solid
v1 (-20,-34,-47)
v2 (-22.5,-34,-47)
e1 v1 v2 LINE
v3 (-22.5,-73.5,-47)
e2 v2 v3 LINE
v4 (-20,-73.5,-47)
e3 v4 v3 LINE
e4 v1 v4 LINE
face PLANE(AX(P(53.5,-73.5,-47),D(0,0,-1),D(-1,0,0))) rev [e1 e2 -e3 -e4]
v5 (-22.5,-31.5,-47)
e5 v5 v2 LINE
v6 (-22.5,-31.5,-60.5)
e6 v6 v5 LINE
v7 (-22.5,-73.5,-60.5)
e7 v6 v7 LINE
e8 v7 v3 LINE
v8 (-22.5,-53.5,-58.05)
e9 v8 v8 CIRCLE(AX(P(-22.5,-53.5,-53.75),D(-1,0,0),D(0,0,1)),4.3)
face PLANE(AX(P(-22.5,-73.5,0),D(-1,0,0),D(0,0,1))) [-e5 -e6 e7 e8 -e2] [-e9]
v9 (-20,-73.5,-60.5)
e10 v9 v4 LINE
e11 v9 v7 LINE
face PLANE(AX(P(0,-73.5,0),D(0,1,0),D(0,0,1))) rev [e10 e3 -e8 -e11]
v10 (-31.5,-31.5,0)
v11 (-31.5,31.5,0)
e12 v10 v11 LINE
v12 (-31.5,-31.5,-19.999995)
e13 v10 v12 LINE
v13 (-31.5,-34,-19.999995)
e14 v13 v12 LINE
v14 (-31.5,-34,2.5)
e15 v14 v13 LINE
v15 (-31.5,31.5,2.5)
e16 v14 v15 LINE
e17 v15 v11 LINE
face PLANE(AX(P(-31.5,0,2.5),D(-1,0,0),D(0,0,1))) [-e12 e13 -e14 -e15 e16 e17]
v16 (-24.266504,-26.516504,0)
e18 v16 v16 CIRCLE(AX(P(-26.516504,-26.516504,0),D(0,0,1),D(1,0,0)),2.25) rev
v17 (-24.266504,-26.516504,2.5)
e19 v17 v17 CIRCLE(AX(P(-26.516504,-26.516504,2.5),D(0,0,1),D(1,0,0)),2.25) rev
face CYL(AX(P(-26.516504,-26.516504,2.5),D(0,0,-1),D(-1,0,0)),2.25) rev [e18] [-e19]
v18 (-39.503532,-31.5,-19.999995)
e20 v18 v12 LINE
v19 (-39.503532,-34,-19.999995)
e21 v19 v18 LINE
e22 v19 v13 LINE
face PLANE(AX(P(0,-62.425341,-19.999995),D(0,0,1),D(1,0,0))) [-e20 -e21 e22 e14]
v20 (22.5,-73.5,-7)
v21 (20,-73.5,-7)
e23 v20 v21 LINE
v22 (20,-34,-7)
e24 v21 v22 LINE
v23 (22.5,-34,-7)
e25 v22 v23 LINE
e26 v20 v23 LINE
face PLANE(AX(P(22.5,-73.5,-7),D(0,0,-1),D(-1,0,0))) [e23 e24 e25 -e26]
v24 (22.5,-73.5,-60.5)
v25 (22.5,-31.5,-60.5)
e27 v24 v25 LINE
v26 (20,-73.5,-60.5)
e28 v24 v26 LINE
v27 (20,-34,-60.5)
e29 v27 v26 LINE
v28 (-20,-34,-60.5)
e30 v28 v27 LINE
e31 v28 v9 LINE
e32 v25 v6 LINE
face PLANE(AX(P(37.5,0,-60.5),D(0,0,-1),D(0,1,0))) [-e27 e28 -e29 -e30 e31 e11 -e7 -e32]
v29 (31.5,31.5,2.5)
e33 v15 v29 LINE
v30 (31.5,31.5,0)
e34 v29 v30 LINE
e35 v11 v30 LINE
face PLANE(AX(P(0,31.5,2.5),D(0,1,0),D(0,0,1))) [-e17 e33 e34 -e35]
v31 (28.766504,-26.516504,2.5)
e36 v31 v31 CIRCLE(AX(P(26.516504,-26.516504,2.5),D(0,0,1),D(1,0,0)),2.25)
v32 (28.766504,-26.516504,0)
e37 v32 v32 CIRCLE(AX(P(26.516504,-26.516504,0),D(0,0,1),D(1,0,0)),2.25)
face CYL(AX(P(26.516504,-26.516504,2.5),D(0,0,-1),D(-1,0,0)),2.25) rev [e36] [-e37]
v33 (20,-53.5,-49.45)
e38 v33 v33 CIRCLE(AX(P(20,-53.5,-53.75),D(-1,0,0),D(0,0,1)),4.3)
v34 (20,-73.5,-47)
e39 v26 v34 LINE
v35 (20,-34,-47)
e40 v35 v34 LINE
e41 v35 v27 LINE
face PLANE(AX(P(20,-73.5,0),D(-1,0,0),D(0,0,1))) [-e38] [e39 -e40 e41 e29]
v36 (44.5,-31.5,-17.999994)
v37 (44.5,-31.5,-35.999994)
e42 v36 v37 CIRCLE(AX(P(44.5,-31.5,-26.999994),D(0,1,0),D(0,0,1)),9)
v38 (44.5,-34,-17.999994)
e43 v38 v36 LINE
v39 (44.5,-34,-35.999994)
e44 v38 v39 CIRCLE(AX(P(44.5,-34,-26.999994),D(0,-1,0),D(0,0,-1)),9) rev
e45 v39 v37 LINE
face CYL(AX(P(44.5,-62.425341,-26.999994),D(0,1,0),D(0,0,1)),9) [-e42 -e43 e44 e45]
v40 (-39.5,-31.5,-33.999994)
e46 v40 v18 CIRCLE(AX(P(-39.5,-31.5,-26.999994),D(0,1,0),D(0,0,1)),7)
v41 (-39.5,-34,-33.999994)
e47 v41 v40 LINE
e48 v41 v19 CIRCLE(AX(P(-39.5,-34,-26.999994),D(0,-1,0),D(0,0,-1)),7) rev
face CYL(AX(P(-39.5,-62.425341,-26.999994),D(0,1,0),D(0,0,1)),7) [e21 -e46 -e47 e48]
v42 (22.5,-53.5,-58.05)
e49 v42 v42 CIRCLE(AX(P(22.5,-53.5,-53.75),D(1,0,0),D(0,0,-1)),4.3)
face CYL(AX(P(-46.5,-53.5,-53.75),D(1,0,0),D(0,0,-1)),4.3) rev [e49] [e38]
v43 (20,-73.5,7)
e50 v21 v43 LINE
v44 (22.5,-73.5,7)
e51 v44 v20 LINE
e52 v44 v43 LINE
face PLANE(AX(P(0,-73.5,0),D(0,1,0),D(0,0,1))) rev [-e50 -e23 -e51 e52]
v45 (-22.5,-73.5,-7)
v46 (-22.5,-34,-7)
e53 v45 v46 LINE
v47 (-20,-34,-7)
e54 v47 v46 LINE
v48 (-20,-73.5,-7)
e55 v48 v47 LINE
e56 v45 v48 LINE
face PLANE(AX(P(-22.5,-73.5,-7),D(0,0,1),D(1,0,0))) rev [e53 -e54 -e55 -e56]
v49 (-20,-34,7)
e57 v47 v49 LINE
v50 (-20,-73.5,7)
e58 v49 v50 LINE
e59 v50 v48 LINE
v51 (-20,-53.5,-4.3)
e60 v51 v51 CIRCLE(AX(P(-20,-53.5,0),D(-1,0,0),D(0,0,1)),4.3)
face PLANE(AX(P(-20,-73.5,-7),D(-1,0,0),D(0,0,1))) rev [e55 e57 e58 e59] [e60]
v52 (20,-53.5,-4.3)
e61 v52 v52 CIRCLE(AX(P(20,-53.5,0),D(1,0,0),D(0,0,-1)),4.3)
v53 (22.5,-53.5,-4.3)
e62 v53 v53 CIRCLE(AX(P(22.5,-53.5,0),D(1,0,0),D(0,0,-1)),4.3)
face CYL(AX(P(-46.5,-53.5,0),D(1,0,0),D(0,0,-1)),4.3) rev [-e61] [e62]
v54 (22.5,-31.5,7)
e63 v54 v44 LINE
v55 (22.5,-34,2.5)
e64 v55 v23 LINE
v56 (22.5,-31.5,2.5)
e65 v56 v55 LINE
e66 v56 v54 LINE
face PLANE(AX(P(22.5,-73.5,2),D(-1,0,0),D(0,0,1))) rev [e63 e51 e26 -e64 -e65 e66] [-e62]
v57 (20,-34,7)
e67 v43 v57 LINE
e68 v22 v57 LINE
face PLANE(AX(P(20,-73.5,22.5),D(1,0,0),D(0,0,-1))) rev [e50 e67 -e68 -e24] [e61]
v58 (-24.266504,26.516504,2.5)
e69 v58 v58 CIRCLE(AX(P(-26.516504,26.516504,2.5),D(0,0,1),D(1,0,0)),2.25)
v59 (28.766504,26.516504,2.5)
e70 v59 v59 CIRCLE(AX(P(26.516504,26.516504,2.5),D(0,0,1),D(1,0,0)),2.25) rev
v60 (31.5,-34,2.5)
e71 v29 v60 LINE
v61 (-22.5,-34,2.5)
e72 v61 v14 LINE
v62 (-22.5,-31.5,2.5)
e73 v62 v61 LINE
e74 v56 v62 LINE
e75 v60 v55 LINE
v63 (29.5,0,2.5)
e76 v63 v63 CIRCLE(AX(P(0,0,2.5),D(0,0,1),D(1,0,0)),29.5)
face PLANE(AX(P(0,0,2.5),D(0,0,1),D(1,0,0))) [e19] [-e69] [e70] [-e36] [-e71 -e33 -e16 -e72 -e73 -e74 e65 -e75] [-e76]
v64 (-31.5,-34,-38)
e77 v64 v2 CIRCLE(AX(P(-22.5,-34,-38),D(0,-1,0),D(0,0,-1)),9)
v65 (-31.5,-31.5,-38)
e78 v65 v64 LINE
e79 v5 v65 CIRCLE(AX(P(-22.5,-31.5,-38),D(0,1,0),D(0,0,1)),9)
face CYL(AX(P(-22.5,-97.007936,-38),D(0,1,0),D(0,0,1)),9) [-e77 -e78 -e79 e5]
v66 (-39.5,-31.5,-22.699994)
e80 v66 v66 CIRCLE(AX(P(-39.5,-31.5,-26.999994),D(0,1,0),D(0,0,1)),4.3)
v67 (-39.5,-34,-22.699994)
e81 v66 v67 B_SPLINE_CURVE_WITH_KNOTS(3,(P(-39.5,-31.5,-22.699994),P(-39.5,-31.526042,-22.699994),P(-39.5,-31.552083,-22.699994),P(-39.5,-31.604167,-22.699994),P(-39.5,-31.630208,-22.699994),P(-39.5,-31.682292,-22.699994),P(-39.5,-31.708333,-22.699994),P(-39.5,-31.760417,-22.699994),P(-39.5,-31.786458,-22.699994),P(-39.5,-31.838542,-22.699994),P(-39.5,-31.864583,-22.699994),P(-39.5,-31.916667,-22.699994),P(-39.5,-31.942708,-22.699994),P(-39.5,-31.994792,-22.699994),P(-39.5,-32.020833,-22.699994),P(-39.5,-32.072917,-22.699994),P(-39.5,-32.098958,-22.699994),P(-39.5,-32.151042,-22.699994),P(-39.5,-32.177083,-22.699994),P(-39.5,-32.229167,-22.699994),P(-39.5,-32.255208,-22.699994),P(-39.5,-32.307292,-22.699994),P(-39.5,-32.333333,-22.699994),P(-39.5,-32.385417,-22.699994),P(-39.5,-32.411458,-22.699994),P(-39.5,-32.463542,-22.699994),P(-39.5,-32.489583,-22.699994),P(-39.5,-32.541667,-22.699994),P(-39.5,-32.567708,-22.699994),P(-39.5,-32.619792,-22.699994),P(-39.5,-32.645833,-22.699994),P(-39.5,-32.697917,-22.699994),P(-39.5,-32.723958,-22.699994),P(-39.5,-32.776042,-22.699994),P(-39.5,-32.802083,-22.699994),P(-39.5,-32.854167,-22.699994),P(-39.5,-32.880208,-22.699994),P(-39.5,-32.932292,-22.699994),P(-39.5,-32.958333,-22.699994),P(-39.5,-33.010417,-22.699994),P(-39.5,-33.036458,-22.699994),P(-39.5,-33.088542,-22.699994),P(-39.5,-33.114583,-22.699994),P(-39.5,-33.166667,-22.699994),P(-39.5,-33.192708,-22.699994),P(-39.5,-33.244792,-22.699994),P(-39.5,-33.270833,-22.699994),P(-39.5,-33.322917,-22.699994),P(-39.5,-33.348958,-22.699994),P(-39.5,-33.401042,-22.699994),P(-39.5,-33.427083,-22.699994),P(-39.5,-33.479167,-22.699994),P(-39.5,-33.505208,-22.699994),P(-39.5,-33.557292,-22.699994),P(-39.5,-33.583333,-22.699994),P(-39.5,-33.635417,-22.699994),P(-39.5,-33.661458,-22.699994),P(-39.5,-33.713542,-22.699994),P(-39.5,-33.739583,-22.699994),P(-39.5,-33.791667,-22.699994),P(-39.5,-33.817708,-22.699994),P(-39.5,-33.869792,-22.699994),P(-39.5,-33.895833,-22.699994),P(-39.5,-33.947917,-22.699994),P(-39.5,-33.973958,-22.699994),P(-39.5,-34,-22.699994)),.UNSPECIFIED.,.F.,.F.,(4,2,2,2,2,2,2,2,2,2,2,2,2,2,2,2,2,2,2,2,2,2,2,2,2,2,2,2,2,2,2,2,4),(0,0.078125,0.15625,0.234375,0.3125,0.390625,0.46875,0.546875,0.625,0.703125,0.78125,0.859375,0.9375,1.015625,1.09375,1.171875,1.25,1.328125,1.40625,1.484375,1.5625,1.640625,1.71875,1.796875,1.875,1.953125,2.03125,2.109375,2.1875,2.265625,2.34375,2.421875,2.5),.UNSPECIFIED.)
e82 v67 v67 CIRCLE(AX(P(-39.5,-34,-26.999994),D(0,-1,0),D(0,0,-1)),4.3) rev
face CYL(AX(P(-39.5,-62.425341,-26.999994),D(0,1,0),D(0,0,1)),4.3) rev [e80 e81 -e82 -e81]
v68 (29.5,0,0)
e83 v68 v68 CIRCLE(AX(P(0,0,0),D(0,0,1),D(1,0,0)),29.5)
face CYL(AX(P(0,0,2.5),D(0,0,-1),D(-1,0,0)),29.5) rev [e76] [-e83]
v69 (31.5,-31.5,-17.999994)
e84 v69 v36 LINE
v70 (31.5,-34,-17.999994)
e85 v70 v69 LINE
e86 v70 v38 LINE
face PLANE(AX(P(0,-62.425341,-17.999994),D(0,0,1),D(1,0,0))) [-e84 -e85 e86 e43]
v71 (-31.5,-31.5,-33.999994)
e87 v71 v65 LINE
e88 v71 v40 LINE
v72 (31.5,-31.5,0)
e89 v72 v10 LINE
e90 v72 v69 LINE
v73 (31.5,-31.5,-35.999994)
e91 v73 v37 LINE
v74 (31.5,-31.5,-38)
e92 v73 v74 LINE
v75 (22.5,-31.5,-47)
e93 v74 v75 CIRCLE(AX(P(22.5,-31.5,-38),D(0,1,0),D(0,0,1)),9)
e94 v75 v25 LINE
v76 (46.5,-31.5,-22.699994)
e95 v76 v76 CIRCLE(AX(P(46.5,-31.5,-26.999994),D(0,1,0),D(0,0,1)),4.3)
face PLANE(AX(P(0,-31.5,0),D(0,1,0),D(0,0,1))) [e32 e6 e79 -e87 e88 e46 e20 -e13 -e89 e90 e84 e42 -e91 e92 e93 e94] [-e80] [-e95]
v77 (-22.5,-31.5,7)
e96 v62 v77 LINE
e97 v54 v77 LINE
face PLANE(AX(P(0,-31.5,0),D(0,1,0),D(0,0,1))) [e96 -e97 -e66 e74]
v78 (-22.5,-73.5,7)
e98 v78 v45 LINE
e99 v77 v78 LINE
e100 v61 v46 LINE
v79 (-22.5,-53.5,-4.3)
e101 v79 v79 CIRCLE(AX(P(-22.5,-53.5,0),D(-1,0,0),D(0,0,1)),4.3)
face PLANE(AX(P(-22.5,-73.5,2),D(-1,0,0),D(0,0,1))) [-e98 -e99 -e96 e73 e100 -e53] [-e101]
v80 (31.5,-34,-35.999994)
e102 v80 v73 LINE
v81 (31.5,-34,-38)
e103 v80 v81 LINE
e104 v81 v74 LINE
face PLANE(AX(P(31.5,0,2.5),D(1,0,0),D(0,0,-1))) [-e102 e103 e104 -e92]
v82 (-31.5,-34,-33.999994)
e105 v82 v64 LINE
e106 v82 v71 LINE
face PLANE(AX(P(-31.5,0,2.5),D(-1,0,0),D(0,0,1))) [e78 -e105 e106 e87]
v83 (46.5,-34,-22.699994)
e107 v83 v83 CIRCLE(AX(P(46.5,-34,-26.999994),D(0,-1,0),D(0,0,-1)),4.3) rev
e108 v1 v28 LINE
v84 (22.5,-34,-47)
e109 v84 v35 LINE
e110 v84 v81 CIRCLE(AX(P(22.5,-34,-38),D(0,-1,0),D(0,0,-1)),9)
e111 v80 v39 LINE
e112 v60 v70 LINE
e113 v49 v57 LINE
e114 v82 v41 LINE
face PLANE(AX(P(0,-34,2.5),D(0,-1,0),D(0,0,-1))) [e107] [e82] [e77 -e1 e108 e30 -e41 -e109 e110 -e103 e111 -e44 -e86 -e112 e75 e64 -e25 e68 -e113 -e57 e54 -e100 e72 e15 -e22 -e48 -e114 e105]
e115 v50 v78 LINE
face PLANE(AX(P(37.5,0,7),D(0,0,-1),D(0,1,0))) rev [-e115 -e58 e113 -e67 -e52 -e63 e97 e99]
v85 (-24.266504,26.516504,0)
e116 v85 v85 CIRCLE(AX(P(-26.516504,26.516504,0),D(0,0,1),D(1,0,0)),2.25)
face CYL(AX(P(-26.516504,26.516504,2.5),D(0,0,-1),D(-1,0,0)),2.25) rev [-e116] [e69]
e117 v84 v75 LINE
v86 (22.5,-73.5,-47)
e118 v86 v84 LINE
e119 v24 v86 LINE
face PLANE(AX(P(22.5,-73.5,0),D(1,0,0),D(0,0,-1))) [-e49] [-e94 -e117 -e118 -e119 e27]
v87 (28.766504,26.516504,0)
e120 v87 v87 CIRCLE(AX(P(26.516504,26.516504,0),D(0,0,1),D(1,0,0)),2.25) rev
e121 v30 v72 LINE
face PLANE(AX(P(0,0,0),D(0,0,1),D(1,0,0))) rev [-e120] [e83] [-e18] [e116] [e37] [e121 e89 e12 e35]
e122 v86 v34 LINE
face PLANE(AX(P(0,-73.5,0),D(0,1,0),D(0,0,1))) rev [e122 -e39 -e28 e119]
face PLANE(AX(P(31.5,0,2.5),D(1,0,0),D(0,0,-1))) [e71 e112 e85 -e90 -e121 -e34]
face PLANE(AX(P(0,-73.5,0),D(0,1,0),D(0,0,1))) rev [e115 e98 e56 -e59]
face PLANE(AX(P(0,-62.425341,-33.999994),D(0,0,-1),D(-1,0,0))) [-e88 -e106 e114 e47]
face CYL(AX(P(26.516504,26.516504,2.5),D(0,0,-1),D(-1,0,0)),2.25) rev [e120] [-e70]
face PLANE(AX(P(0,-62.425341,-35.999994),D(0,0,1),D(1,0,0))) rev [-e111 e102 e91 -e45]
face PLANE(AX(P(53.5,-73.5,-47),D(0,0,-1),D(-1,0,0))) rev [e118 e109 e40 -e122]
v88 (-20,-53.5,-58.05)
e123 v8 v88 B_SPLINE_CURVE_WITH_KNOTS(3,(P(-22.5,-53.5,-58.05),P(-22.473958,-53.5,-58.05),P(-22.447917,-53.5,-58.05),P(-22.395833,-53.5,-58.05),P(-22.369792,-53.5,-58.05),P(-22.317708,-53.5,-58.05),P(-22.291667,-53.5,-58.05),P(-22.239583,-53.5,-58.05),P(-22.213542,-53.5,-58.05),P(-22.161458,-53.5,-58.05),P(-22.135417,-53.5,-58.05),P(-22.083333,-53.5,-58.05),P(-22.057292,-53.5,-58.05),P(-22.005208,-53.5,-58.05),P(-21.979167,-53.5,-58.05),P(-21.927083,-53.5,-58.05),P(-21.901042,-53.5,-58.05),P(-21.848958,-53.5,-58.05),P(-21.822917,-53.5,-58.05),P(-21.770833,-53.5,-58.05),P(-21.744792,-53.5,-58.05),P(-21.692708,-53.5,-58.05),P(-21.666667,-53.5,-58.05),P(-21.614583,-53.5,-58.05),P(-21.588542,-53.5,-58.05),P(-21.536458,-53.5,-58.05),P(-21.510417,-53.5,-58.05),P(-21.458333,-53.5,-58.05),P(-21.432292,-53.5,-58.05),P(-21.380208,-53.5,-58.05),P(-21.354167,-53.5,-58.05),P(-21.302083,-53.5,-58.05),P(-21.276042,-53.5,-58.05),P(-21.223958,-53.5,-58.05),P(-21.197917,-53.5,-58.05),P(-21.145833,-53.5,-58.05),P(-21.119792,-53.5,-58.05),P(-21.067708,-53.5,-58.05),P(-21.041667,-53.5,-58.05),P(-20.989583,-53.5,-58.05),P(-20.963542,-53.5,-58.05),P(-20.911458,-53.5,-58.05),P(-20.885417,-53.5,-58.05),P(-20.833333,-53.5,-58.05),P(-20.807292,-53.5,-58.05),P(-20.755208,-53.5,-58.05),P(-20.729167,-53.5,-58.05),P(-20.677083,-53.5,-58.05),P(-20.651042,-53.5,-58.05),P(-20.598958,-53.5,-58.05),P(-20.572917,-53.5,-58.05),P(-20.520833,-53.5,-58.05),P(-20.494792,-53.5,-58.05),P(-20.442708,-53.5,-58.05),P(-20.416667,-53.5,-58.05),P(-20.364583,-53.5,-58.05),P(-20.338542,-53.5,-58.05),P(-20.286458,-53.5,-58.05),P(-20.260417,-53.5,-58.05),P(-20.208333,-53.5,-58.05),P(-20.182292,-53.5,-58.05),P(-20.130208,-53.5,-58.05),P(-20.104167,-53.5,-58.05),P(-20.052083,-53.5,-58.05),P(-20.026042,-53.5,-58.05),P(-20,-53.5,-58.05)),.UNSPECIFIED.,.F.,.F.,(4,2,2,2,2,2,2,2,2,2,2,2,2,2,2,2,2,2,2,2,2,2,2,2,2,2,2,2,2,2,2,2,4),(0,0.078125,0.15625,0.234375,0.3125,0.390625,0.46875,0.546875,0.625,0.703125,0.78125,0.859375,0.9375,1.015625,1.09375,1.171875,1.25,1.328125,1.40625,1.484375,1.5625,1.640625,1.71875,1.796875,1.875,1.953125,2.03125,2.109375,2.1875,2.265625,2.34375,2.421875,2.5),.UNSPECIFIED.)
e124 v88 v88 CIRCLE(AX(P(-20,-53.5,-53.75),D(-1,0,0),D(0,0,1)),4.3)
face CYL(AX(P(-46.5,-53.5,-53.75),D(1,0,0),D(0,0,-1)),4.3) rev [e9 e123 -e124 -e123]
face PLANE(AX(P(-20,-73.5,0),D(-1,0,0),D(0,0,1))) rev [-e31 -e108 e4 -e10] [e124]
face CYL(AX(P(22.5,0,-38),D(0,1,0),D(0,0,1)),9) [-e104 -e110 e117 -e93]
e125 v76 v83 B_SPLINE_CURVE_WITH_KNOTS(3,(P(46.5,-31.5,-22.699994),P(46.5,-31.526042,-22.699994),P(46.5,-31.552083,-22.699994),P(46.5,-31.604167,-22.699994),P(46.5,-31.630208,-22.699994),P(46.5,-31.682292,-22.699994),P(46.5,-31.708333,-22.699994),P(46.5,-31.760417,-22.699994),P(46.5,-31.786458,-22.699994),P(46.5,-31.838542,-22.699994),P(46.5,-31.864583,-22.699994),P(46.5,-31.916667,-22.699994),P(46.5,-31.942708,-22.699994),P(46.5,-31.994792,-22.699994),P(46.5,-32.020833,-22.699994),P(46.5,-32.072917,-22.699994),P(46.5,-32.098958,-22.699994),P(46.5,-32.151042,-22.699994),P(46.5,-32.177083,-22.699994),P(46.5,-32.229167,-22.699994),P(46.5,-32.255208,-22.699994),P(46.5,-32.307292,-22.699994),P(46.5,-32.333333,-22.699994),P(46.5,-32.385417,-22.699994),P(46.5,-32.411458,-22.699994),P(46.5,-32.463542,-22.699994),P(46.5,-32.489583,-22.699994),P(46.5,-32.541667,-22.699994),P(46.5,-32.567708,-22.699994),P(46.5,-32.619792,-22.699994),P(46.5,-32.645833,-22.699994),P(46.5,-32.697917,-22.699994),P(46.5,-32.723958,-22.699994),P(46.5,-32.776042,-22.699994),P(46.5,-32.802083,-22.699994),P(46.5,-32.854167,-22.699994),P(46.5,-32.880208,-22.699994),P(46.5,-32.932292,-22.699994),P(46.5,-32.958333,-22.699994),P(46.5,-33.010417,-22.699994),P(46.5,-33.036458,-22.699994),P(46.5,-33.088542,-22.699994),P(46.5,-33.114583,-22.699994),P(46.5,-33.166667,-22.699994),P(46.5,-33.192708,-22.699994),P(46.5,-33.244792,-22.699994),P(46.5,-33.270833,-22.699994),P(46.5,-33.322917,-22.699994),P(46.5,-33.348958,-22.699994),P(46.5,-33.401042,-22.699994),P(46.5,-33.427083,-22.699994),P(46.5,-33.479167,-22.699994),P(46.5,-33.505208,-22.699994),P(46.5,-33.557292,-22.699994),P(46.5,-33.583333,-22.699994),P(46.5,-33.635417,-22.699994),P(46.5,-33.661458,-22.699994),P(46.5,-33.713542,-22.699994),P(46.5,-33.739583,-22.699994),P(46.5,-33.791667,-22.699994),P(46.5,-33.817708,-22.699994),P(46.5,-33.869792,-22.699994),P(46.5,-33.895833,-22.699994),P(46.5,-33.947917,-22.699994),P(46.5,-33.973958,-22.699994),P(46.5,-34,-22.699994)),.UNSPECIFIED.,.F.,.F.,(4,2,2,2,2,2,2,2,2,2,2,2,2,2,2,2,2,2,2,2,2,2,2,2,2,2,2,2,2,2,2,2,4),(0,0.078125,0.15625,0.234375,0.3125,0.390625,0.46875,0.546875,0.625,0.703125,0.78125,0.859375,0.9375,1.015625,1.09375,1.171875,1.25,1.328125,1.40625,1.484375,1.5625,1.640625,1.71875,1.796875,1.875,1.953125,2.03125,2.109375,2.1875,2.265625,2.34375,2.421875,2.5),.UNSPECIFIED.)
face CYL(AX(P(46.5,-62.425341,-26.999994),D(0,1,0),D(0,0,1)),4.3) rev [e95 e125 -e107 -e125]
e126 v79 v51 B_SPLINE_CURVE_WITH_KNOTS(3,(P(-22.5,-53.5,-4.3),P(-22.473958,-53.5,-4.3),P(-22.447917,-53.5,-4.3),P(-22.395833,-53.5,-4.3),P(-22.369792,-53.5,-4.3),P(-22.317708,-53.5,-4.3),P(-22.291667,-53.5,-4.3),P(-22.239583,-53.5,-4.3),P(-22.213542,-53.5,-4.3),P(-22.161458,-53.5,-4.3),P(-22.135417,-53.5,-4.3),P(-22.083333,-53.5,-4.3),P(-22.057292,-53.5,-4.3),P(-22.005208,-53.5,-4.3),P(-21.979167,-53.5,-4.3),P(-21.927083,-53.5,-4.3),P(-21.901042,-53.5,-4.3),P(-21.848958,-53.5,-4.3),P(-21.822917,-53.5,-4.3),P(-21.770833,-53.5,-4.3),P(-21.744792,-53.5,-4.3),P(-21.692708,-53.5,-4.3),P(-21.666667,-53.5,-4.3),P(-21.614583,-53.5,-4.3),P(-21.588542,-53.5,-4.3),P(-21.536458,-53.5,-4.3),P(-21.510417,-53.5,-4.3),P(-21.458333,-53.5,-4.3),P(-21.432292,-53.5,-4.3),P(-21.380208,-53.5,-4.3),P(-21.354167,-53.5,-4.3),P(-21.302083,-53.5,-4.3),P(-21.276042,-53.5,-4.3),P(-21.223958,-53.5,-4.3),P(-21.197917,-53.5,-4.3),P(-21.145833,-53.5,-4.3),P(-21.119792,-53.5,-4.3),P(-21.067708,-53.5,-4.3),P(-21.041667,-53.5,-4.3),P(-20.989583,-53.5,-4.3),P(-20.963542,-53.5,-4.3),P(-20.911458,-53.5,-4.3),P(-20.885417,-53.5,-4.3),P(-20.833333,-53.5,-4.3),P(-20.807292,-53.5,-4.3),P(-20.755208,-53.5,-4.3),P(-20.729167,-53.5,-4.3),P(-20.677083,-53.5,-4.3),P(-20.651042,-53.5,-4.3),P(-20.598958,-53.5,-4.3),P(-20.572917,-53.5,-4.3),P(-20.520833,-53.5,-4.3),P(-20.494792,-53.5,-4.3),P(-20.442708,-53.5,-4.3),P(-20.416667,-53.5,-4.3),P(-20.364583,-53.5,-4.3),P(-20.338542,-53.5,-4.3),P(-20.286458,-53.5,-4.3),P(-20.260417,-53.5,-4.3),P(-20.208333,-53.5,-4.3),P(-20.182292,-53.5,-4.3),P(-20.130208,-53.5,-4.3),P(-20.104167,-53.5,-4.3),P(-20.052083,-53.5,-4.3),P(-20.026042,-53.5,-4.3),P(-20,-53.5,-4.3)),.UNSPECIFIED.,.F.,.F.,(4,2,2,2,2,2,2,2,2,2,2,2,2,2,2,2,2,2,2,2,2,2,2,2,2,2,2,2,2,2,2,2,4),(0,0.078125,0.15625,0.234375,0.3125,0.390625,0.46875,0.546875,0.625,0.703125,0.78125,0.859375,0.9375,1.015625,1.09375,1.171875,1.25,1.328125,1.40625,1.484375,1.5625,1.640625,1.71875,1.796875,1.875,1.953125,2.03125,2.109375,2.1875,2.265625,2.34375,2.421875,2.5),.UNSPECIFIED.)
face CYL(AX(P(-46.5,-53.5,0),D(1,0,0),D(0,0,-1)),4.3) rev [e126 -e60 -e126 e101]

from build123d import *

# Parameters (mm, degrees)
SKETCH_1_R           = 29.5
SKETCH_1_R_2         = 2.25
EXTRUDE_1_DEPTH      = 2.5
EXTRUDE_2_DEPTH      = 2.5
SKETCH_3_W           = 2.5
SKETCH_3_H           = 20.5
SKETCH_3_H_2         = 29.5
EXTRUDE_3_DEPTH      = 42
SKETCH_4_W           = 15.5
SKETCH_4_H           = 42
SKETCH_4_W_2         = 6
CUT_EXTRUDE_1_DEPTH  = 60
SKETCH_5_R           = 4.3
EXTRUDE_4_DEPTH      = 2.5
CUT_EXTRUDE_9_DEPTH  = 122.813381989
EXTRUDE_6_DEPTH      = 2.5
SKETCH_14_R          = 4.3
CUT_EXTRUDE_10_DEPTH = 118.573381341
FILLET_3_R           = 9


with BuildPart() as part:
    # 草图1 → 凸台-拉伸1 (new body)
    with BuildSketch(Plane.XY):
        Polygon((0, 31.5), (31.5, 31.5), (31.5, -34), (-31.5, -34), (-31.5, 31.5), align=None)
        Circle(SKETCH_1_R, mode=Mode.SUBTRACT)
        with Locations((-26.516504294, 26.516504294)):
            Circle(SKETCH_1_R_2, mode=Mode.SUBTRACT)
        with Locations((26.516504294, 26.516504294)):
            Circle(SKETCH_1_R_2, mode=Mode.SUBTRACT)
        with Locations((26.516504294, -26.516504294)):
            Circle(SKETCH_1_R_2, mode=Mode.SUBTRACT)
        with Locations((-26.516504294, -26.516504294)):
            Circle(SKETCH_1_R_2, mode=Mode.SUBTRACT)
    extrude(amount=EXTRUDE_1_DEPTH)

    # 草图2 → 凸台-拉伸2 (add)
    with BuildSketch(Plane(origin=(0, -34, 0), x_dir=(1, 0, 0), z_dir=(0, 1, 0))):
        Polygon((-31.5, 46.5), (-31.5, -2.5), (-20, -2.5), (-20, -22.5), (20, -22.5), (20, -2.5), (31.5, -2.5), (31.5, 46.5), (20, 46.5), (20, 66.5), (-20, 66.5), (-20, 46.5), align=None)
    extrude(amount=EXTRUDE_2_DEPTH)

    # 草图3 → 凸台-拉伸3 (add)
    with BuildSketch(Plane(origin=(0, -31.5, 0), x_dir=(1, 0, 0), z_dir=(0, 1, 0))):
        with Locations((21.25, 56.25)):
            Rectangle(SKETCH_3_W, SKETCH_3_H)
        with Locations((-21.25, 56.25)):
            Rectangle(SKETCH_3_W, SKETCH_3_H)
        with Locations((-21.25, -7.75)):
            Rectangle(SKETCH_3_W, SKETCH_3_H_2)
        with Locations((21.25, -7.75)):
            Rectangle(SKETCH_3_W, SKETCH_3_H_2)
    extrude(amount=-EXTRUDE_3_DEPTH)

    # 草图4 → 切除-拉伸1 (cut)
    with BuildSketch(Plane.ZY.offset(22.5)):
        with Locations((14.75, -52.5)):
            Rectangle(SKETCH_4_W, SKETCH_4_H)
        with Locations((-63.5, -52.5)):
            Rectangle(SKETCH_4_W_2, SKETCH_4_H)
    extrude(amount=-CUT_EXTRUDE_1_DEPTH, mode=Mode.SUBTRACT)

    # 草图5 → 凸台-拉伸4 (add)
    # profile 1 of 2: a face of its own
    with BuildSketch(Plane(origin=(0, -31.5, 0), x_dir=(1, 0, 0), z_dir=(0, 1, 0))):
        with BuildLine():
            Line((-31.5, 33.999994356), (-39.5, 33.999994356))
            ThreePointArc((-39.5, 33.999994356), (-46.499999777, 27.00176014), (-39.503531569, 19.999995247))
            Line((-39.503531569, 19.999995247), (-31.5, 19.999995247))
            Line((-31.5, 19.999995247), (-31.5, 33.999994356))
        make_face()
        with Locations(Location((-39.5, 26.999994356, 0), (0, 0, 270))):
            Circle(SKETCH_5_R, mode=Mode.SUBTRACT)
    # profile 2 of 2: a face of its own
    with BuildSketch(Plane(origin=(0, -31.5, 0), x_dir=(1, 0, 0), z_dir=(0, 1, 0))):
        with BuildLine():
            Line((44.500000207, 35.999994356), (31.5, 35.999994356))
            Line((31.5, 35.999994356), (31.5, 26.5))
            Line((31.5, 26.5), (31.5, 17.999994356))
            Line((31.5, 17.999994356), (44.500000207, 17.999994356))
            ThreePointArc((44.500000207, 17.999994356), (53.500000207, 26.999994356), (44.500000207, 35.999994356))
        make_face()
        with Locations(Location((46.5, 26.999994356, 0), (0, 0, 270))):
            Circle(SKETCH_5_R, mode=Mode.SUBTRACT)
    extrude(amount=-EXTRUDE_4_DEPTH)

    # 草图12 → 切除-拉伸9 (cut, through all)
    with BuildSketch(Plane.ZY.offset(22.5)):
        Polygon((-46, -73.5), (-47, -73.5), (-47, -31.5), (-46.5, -31.5), (-46, -31.5), align=None)
    extrude(amount=-CUT_EXTRUDE_9_DEPTH, mode=Mode.SUBTRACT)


with BuildPart() as cut_extrude_9_piece_1:
    # of the separate pieces the step leaves, piece 1, a body of its own (cut_extrude_9_pieces)
    add(part.part.solids().sort_by_distance((31.5, 31.5, 0))[0])



with BuildPart() as cut_extrude_9_piece_2:
    # of the separate pieces the step leaves, piece 2, a body of its own (cut_extrude_9_pieces)
    add(part.part.solids().sort_by_distance((-22.5, -31.5, -60.5))[0])


with BuildPart() as cut_extrude_9_piece_1_1:
    add(cut_extrude_9_piece_1.part)

    add(cut_extrude_9_piece_2.part)  # 凸台-拉伸6 merges 切除-拉伸9 piece 2
    # 草图13 → 凸台-拉伸6 (add)
    with BuildSketch(Plane(origin=(0, -31.5, 0), x_dir=(1, 0, 0), z_dir=(0, 1, 0))):
        Polygon((31.5, 46.5), (31.5, 47), (22.5, 47), (-22.5, 47), (-31.5, 47), (-31.5, 46.5), (-22.5, 46.5), (-22.5, 46), (31.5, 46), align=None)
    extrude(amount=-EXTRUDE_6_DEPTH)

    # 草图14 → 切除-拉伸10 (cut, through all)
    with BuildSketch(Plane(origin=(22.5, 0, 0), x_dir=(0, 0, -1), z_dir=(1, 0, 0))):
        with Locations((0, -53.5)):
            Circle(SKETCH_14_R)
        with Locations((53.75, -53.5)):
            Circle(SKETCH_14_R)
    extrude(amount=-CUT_EXTRUDE_10_DEPTH, mode=Mode.SUBTRACT)

    # 圆角3
    fillet_3_edges = [cut_extrude_9_piece_1_1.edges().sort_by_distance(p)[0] for p in [
        (-31.5, -32.75, -47),
        (31.5, -32.75, -47),
    ]]
    fillet(fillet_3_edges, radius=FILLET_3_R - 0.0001)  # a hair under: the kernel refuses the full size


solid = cut_extrude_9_piece_1_1.part
